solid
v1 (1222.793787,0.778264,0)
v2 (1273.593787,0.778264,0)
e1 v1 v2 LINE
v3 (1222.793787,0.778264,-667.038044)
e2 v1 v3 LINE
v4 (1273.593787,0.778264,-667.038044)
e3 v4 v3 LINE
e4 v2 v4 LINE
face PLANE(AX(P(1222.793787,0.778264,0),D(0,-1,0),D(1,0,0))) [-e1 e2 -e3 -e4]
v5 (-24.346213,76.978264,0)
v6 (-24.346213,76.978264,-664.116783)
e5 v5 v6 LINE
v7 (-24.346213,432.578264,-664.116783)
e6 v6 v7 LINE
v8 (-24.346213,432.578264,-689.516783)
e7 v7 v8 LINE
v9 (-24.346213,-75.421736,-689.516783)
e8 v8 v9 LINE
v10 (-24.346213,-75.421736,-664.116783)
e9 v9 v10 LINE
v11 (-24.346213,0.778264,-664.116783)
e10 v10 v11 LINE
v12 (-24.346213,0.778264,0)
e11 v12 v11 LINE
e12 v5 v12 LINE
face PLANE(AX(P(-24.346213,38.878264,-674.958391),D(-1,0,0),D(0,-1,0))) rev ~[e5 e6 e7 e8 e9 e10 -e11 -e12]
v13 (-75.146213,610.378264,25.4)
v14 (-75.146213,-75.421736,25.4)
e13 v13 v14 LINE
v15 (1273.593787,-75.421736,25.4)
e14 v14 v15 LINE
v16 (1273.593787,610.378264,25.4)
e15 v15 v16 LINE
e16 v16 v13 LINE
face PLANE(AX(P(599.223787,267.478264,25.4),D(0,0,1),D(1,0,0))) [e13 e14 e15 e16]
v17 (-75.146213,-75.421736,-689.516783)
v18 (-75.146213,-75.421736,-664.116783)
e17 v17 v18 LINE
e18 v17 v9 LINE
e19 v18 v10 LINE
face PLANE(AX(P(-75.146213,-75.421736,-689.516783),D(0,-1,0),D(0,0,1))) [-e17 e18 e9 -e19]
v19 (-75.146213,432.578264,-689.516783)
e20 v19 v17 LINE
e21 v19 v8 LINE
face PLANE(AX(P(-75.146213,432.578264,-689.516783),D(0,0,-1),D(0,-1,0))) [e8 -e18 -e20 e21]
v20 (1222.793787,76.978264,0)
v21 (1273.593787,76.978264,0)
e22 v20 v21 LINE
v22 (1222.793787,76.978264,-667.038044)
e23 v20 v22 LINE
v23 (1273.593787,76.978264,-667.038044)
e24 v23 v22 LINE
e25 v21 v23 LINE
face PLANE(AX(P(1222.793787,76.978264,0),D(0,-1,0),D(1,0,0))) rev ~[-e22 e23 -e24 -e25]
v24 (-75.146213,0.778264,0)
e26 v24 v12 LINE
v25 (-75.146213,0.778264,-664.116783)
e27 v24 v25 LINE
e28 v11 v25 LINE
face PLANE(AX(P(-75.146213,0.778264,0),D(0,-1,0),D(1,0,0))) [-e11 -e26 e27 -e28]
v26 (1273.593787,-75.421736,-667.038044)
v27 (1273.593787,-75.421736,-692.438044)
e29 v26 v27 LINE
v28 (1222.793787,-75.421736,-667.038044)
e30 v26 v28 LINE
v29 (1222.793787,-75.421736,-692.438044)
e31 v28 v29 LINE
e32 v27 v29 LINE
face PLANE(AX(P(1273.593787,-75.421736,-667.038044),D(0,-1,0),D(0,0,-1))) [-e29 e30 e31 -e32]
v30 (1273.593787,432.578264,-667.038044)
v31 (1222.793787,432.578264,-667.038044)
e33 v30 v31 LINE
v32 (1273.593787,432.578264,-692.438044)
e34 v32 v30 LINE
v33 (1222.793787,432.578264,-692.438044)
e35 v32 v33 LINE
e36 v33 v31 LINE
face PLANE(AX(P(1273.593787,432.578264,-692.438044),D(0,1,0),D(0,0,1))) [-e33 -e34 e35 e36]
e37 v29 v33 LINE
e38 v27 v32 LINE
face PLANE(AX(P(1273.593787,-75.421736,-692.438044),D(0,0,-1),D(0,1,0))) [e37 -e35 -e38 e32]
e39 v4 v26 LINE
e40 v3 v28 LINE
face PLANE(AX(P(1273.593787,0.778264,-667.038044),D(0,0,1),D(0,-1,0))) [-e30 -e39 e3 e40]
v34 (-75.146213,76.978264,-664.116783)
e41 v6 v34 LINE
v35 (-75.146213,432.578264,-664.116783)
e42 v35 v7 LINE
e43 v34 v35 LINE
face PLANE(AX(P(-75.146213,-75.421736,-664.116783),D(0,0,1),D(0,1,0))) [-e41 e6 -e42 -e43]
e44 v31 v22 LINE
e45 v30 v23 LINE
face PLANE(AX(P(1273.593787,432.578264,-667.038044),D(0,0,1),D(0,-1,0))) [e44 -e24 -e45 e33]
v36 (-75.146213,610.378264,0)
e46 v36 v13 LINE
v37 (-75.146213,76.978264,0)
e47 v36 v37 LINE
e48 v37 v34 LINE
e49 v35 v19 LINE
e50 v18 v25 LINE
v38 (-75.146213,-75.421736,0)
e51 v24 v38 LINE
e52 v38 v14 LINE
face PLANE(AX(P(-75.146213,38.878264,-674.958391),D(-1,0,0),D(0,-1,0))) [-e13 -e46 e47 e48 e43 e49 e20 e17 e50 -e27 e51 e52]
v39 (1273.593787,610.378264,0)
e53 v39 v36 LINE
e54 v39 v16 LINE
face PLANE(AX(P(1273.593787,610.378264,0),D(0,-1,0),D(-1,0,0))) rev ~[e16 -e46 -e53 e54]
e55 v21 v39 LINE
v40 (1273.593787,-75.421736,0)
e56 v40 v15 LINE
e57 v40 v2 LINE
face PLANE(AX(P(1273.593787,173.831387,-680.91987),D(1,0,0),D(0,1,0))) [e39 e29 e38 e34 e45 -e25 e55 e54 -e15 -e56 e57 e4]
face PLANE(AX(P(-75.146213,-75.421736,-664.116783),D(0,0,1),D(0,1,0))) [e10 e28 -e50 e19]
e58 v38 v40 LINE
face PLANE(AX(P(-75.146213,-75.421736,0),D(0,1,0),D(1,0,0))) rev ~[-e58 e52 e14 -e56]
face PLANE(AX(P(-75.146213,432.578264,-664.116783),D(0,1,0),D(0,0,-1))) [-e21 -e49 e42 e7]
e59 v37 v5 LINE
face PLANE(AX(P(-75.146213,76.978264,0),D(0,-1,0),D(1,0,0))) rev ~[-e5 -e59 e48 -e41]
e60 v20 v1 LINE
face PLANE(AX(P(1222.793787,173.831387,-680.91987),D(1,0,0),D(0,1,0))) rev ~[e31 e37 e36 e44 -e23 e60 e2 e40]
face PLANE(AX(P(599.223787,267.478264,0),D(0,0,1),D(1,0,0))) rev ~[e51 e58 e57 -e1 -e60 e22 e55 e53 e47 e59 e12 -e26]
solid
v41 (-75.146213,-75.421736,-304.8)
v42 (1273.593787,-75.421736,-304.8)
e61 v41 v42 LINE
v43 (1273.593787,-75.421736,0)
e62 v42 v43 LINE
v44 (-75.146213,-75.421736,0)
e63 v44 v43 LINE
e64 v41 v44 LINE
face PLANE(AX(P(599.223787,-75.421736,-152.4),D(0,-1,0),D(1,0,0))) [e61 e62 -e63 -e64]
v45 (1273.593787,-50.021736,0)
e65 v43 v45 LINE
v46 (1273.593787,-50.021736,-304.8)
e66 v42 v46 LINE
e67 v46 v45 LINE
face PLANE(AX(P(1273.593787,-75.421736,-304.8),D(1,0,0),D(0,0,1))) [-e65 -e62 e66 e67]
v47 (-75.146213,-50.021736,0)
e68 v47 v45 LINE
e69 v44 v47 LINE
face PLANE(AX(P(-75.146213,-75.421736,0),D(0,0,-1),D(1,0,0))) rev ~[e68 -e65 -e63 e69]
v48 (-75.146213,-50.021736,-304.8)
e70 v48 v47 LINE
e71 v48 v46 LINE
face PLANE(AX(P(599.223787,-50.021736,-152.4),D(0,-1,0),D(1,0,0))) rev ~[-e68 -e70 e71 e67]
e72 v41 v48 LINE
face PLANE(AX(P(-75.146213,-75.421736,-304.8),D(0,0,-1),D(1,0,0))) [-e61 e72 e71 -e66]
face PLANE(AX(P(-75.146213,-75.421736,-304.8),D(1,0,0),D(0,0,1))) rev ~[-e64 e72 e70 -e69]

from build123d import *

# Parameters (mm, degrees)
F1_DEPTH = 25.4
F2_W     = 50.8
F2_H     = 76.2
F3_DEPTH = 685.8
F5_DEPTH = 50.8
F6_W     = 76.2
F6_H     = 21.6832172394
F7_DEPTH = 50.8
F8_W     = 1348.74
F8_H     = 304.8
F9_DEPTH = 25.4


# Not quite as in the source:
# - a feature names something its author has since deleted; it is built from what else it names


with BuildPart() as f1:
    # F0 (on Top) → F1 (new body)
    with BuildSketch(Plane.XY):
        Polygon((-75.1462131739, 533.5789480239), (-75.1462131739, -75.4217356443), (1273.5937868261, -75.4217356443), (1273.5937868261, 610.3782643557), (5.8636856265, 610.3782643557), (-75.1462131739, 610.3782643557), align=None)
    extrude(amount=F1_DEPTH)

    # F2 (on face) → F3 (join)
    with BuildSketch(Plane(origin=(0, 0, 0), x_dir=(1, 0, 0), z_dir=(0, 0, -1))):
        with Locations((-49.7462131739, -38.8782643557)):
            Rectangle(F2_W, F2_H)
        with Locations((1248.1937868261, -38.8782643557)):
            Rectangle(F2_W, F2_H)
    extrude(amount=F3_DEPTH)

    # F4 (on face) → F5 (join)
    with BuildSketch(Plane.YZ.offset(1273.5937868261)):
        Polygon((0.7782643557, -667.0380438323), (-75.4217356443, -667.0380438323), (-75.4217356443, -692.4380438323), (432.5782643557, -692.4380438323), (432.5782643557, -667.0380438323), (76.9782643557, -667.0380438323), (76.9782643557, -685.8), (0.7782643557, -685.8), align=None)
    extrude(amount=-F5_DEPTH)

    # F6 (on face) → F7 (join)
    with BuildSketch(Plane(origin=(-75.1462131739, 0, 0), x_dir=(0, -1, 0), z_dir=(-1, 0, 0))):
        with Locations((-38.8782643557, -674.9583913803)):
            Rectangle(F6_W, F6_H)
        Polygon((75.4217356443, -689.5167827606), (75.4217356443, -664.1167827606), (-0.7782643557, -664.1167827606), (-0.7782643557, -685.8), (-76.9782643557, -685.8), (-76.9782643557, -664.1167827606), (-432.5782643557, -664.1167827606), (-432.5782643557, -689.5167827606), align=None)
    extrude(amount=-F7_DEPTH)


with BuildPart() as f9:
    # F8 (on face) → F9 (new body)
    with BuildSketch(Plane.XZ.offset(75.4217356443)):
        with Locations((599.2237868261, -152.4)):
            Rectangle(F8_W, F8_H)
    extrude(amount=-F9_DEPTH)


solid = Compound([f1.part, f9.part])
